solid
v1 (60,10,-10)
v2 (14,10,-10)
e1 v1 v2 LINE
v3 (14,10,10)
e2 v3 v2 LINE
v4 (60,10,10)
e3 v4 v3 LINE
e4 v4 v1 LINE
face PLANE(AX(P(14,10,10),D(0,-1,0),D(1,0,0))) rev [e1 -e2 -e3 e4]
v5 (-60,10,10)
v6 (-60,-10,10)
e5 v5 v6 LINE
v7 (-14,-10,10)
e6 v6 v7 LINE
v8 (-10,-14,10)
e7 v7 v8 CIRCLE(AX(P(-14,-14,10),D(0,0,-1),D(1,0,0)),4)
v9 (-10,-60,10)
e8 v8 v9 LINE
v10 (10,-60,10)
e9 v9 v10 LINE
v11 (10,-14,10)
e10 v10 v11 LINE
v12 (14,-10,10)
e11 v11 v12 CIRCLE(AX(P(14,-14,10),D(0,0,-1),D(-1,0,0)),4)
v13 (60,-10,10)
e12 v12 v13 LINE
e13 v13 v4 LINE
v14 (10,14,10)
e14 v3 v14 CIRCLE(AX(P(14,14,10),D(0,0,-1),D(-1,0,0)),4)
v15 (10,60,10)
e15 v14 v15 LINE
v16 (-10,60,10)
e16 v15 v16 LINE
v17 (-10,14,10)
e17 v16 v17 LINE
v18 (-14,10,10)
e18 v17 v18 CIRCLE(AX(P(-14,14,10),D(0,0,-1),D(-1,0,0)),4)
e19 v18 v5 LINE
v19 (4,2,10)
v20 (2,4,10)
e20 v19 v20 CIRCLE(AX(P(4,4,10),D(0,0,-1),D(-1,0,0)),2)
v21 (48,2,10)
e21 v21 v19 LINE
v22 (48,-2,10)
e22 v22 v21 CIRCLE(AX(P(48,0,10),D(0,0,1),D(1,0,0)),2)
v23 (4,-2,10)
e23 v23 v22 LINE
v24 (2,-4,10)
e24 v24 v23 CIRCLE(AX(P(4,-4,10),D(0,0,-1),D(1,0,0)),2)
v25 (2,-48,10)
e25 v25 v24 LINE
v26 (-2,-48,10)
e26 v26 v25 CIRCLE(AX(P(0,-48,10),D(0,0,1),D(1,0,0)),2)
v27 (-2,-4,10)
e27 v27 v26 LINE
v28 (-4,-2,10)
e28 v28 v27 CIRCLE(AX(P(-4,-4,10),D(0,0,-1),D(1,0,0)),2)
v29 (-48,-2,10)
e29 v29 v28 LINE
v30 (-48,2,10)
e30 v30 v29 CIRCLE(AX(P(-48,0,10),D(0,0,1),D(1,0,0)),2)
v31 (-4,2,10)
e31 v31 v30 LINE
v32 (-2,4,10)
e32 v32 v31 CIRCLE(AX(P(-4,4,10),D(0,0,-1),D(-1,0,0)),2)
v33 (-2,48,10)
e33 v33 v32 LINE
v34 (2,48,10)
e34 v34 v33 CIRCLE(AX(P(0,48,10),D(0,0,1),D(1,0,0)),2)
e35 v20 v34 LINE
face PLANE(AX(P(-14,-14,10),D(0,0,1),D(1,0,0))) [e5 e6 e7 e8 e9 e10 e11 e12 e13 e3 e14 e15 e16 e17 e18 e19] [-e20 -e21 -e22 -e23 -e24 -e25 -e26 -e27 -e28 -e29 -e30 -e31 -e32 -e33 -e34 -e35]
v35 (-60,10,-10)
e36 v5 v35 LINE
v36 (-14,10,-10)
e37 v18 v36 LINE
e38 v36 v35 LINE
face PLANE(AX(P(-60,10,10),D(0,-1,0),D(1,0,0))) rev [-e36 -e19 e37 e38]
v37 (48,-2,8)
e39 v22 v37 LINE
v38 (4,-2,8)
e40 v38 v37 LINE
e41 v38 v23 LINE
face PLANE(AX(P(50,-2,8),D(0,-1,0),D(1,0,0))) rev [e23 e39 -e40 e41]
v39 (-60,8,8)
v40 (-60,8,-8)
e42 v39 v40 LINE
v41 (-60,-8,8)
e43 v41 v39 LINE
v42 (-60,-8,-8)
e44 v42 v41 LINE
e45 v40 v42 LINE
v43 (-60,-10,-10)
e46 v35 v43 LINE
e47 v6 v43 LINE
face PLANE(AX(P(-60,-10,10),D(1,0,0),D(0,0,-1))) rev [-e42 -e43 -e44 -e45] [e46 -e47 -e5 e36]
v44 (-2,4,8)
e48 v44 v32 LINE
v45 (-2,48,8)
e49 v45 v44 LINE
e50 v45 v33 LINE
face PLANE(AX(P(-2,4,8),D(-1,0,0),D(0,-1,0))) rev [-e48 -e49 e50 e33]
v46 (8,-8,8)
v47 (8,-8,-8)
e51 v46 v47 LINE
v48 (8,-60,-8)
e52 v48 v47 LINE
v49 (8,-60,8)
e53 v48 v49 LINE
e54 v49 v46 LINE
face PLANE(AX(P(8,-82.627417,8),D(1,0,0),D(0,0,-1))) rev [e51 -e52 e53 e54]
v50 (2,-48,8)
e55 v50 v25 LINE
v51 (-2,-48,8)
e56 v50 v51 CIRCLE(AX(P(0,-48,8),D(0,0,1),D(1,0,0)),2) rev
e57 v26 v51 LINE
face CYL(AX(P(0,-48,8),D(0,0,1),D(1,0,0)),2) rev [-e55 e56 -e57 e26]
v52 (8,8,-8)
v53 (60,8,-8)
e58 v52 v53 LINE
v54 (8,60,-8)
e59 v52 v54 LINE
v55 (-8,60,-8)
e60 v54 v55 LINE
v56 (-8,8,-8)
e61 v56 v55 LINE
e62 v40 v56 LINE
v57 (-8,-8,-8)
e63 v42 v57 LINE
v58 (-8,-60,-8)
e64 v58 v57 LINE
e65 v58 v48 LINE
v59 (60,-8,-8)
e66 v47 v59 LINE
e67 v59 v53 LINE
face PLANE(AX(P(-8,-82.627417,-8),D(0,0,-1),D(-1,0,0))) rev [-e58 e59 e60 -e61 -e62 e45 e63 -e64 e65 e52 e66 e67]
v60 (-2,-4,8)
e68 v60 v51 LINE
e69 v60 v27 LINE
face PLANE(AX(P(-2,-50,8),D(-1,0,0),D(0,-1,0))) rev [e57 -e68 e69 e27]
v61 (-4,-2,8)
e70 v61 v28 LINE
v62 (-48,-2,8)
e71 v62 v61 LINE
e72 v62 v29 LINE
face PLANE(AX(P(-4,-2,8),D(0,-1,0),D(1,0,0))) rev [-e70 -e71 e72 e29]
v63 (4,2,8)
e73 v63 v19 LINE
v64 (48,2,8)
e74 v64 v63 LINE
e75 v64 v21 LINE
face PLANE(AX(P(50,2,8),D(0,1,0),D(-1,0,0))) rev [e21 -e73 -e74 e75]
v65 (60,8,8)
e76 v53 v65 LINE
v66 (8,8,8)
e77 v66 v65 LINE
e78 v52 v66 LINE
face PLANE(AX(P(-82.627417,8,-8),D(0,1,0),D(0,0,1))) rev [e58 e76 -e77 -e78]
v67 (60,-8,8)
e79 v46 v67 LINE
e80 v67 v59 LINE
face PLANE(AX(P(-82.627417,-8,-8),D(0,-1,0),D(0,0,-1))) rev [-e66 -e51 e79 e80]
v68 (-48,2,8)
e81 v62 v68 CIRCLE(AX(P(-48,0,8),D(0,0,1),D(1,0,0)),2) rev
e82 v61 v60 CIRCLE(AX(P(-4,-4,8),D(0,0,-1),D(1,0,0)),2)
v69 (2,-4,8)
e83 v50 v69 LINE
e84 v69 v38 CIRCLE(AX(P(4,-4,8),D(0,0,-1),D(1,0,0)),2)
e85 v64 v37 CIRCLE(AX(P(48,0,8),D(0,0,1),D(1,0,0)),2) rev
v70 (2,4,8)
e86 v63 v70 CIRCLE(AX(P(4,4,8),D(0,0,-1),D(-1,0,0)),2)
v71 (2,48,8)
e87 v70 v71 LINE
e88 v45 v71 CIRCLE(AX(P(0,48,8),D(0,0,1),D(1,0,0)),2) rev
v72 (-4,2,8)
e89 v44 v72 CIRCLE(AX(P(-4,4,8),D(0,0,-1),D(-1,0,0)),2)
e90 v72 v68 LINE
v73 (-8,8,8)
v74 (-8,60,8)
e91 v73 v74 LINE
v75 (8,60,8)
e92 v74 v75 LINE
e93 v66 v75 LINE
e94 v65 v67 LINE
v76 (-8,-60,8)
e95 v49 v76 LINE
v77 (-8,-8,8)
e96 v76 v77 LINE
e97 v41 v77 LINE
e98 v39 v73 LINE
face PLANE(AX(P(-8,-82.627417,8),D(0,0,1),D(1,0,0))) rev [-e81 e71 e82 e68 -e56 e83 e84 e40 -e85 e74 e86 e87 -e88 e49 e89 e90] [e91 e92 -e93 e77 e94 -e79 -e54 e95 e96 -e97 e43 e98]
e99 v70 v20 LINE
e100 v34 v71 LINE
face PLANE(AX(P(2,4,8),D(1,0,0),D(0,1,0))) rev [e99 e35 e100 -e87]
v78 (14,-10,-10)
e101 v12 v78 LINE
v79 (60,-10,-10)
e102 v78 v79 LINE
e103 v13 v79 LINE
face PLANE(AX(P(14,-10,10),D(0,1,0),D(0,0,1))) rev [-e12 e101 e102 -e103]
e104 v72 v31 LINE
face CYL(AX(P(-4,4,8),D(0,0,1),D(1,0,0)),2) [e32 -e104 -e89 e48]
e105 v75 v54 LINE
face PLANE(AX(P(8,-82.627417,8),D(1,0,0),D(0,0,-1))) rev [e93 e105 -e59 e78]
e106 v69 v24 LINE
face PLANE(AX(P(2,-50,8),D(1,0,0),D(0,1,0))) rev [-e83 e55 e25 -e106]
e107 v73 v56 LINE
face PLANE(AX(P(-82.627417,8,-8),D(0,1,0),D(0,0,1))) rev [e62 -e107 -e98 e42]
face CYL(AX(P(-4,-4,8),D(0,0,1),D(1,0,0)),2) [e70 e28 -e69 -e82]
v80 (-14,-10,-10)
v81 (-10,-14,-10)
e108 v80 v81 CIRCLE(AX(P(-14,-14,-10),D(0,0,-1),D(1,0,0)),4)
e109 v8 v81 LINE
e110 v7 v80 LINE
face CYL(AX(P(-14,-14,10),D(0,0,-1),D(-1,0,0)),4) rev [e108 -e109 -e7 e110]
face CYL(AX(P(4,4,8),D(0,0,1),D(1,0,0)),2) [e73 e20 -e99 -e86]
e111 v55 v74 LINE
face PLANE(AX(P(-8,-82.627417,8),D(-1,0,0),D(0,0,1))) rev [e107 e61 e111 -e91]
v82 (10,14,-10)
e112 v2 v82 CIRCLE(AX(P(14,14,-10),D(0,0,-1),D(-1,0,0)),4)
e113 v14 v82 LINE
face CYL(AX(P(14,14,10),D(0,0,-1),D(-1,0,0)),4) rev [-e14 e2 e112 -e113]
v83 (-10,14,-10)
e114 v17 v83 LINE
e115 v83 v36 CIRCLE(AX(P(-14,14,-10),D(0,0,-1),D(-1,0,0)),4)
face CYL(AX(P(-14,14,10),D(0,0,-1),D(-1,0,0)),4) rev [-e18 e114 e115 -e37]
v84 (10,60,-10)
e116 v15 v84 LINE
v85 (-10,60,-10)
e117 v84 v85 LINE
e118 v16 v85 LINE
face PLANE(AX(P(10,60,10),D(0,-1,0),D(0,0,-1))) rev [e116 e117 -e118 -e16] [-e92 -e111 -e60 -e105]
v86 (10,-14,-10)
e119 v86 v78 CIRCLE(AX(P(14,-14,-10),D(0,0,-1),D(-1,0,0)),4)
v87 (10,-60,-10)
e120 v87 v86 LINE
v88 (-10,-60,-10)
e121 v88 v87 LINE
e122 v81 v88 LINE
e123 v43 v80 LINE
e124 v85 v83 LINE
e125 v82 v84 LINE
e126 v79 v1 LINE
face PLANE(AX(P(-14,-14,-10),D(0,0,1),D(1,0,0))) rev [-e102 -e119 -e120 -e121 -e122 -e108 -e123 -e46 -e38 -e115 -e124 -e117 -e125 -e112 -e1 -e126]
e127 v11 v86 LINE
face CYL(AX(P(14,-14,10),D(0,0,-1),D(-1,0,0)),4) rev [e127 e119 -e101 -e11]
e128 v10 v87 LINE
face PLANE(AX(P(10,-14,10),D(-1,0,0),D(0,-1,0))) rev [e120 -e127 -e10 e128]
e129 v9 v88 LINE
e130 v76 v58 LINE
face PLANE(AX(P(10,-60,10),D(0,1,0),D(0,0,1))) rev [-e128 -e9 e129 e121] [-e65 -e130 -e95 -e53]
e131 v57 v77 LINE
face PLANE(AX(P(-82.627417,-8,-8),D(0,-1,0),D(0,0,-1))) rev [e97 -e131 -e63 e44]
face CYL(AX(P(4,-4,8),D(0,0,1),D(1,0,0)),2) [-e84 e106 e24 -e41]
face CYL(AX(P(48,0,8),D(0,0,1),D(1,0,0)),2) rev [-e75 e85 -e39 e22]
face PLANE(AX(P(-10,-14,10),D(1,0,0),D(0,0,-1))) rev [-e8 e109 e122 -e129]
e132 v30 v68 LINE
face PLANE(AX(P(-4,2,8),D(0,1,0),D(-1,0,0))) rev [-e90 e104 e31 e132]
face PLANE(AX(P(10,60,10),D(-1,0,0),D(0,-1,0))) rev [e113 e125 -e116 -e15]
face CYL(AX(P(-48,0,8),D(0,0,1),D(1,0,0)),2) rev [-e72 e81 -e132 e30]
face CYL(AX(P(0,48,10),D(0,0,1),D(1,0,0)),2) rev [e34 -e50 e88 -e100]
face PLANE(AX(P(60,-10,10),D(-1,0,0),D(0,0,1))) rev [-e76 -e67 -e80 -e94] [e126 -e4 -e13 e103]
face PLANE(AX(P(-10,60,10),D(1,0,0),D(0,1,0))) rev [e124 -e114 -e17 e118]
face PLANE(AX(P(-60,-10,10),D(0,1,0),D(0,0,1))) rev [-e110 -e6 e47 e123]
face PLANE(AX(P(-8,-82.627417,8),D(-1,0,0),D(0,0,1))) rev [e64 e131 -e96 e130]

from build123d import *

# Parameters (mm, degrees)
BOSS_EXTRUDE1_DEPTH = 10
SKETCH5_W           = 16
SKETCH5_H           = 16
CUT_EXTRUDE1_DEPTH  = 120
CUT_EXTRUDE2_REACH  = 136.536
SKETCH3_W           = 16
SKETCH3_H           = 16
CUT_EXTRUDE3_DEPTH  = 2
FILLET1_R           = 2
FILLET2_R           = 2
FILLET3_R           = 2
FILLET4_R           = 2


with BuildPart() as part:
    # Sketch2 → Boss-Extrude1 (new, symmetric)
    with BuildSketch(Plane.XY):
        with BuildLine():
            Line((10, 60), (-10, 60))
            Line((-10, 60), (-10, 14))
            ThreePointArc((-10, 14), (-11.171572875, 11.171572875), (-14, 10))
            Line((-14, 10), (-60, 10))
            Line((-60, 10), (-60, -10))
            Line((-60, -10), (-14, -10))
            ThreePointArc((-14, -10), (-11.171572875, -11.171572875), (-10, -14))
            Line((-10, -14), (-10, -60))
            Line((-10, -60), (10, -60))
            Line((10, -60), (10, -14))
            ThreePointArc((10, -14), (11.171572875, -11.171572875), (14, -10))
            Line((14, -10), (60, -10))
            Line((60, -10), (60, 10))
            Line((60, 10), (14, 10))
            ThreePointArc((14, 10), (11.171572875, 11.171572875), (10, 14))
            Line((10, 14), (10, 60))
        make_face()
    extrude(amount=BOSS_EXTRUDE1_DEPTH, both=True)

    # Sketch5 → Cut-Extrude1 (cut)
    with BuildSketch(Plane(origin=(0, 60, 0), x_dir=(1, 0, 0), z_dir=(0, 1, 0))):
        Rectangle(SKETCH5_W, SKETCH5_H)
    extrude(amount=-CUT_EXTRUDE1_DEPTH, mode=Mode.SUBTRACT)

    # Cut-Extrude2: up to this face of the body (flat: up to its plane)
    cut_extrude2_end = Plane(part.part.faces().sort_by_distance((-60, 0, 0))[0])
    # Sketch3 → Cut-Extrude2 (cut, up to the picked face)
    with BuildSketch(Plane(origin=(60, 0, 0), x_dir=(0, 0, -1), z_dir=(1, 0, 0)), mode=Mode.PRIVATE) as cut_extrude2_sk1:
        Rectangle(SKETCH3_W, SKETCH3_H)
    cut_extrude2_tool1 = split(extrude(cut_extrude2_sk1.sketch, amount=-CUT_EXTRUDE2_REACH, mode=Mode.PRIVATE), bisect_by=cut_extrude2_end, keep=Keep.BOTH, mode=Mode.PRIVATE)
    add(cut_extrude2_tool1.solids().sort_by(Axis((60, 0, 0), (-1, 0, 0)))[0], mode=Mode.SUBTRACT)

    # Sketch6 → Cut-Extrude3 (cut)
    with BuildSketch(Plane.XY.offset(10)):
        with BuildLine():
            Line((-2, 4), (-2, 50))
            Line((-2, 50), (2, 50))
            Line((2, 50), (2, 4))
            ThreePointArc((2, 4), (2.585786438, 2.585786438), (4, 2))
            Line((4, 2), (50, 2))
            Line((50, 2), (50, -2))
            Line((50, -2), (4, -2))
            ThreePointArc((4, -2), (2.585786438, -2.585786438), (2, -4))
            Line((2, -4), (2, -50))
            Line((2, -50), (-2, -50))
            Line((-2, -50), (-2, -4))
            ThreePointArc((-2, -4), (-2.585786438, -2.585786438), (-4, -2))
            Line((-4, -2), (-50, -2))
            Line((-50, -2), (-50, 2))
            Line((-50, 2), (-4, 2))
            ThreePointArc((-4, 2), (-2.585786438, 2.585786438), (-2, 4))
        make_face()
    extrude(amount=-CUT_EXTRUDE3_DEPTH, mode=Mode.SUBTRACT)

    # Fillet1
    fillet1_edges = [part.edges().sort_by_distance(p)[0] for p in [
        (-2, 50, 9),
        (2, 50, 9),
    ]]
    fillet(fillet1_edges, radius=FILLET1_R - 0.0001)  # a hair under: the kernel refuses the full size

    # Fillet2
    fillet2_edges = [part.edges().sort_by_distance(p)[0] for p in [
        (2, -50, 9),
        (-2, -50, 9),
    ]]
    fillet(fillet2_edges, radius=FILLET2_R - 0.0001)  # a hair under: the kernel refuses the full size

    # Fillet3
    fillet3_edges = [part.edges().sort_by_distance(p)[0] for p in [
        (50, 2, 9),
        (50, -2, 9),
    ]]
    fillet(fillet3_edges, radius=FILLET3_R - 0.0001)  # a hair under: the kernel refuses the full size

    # Fillet4
    fillet4_edges = [part.edges().sort_by_distance(p)[0] for p in [
        (-50, -2, 9),
        (-50, 2, 9),
    ]]
    fillet(fillet4_edges, radius=FILLET4_R - 0.0001)  # a hair under: the kernel refuses the full size


solid = part.part
